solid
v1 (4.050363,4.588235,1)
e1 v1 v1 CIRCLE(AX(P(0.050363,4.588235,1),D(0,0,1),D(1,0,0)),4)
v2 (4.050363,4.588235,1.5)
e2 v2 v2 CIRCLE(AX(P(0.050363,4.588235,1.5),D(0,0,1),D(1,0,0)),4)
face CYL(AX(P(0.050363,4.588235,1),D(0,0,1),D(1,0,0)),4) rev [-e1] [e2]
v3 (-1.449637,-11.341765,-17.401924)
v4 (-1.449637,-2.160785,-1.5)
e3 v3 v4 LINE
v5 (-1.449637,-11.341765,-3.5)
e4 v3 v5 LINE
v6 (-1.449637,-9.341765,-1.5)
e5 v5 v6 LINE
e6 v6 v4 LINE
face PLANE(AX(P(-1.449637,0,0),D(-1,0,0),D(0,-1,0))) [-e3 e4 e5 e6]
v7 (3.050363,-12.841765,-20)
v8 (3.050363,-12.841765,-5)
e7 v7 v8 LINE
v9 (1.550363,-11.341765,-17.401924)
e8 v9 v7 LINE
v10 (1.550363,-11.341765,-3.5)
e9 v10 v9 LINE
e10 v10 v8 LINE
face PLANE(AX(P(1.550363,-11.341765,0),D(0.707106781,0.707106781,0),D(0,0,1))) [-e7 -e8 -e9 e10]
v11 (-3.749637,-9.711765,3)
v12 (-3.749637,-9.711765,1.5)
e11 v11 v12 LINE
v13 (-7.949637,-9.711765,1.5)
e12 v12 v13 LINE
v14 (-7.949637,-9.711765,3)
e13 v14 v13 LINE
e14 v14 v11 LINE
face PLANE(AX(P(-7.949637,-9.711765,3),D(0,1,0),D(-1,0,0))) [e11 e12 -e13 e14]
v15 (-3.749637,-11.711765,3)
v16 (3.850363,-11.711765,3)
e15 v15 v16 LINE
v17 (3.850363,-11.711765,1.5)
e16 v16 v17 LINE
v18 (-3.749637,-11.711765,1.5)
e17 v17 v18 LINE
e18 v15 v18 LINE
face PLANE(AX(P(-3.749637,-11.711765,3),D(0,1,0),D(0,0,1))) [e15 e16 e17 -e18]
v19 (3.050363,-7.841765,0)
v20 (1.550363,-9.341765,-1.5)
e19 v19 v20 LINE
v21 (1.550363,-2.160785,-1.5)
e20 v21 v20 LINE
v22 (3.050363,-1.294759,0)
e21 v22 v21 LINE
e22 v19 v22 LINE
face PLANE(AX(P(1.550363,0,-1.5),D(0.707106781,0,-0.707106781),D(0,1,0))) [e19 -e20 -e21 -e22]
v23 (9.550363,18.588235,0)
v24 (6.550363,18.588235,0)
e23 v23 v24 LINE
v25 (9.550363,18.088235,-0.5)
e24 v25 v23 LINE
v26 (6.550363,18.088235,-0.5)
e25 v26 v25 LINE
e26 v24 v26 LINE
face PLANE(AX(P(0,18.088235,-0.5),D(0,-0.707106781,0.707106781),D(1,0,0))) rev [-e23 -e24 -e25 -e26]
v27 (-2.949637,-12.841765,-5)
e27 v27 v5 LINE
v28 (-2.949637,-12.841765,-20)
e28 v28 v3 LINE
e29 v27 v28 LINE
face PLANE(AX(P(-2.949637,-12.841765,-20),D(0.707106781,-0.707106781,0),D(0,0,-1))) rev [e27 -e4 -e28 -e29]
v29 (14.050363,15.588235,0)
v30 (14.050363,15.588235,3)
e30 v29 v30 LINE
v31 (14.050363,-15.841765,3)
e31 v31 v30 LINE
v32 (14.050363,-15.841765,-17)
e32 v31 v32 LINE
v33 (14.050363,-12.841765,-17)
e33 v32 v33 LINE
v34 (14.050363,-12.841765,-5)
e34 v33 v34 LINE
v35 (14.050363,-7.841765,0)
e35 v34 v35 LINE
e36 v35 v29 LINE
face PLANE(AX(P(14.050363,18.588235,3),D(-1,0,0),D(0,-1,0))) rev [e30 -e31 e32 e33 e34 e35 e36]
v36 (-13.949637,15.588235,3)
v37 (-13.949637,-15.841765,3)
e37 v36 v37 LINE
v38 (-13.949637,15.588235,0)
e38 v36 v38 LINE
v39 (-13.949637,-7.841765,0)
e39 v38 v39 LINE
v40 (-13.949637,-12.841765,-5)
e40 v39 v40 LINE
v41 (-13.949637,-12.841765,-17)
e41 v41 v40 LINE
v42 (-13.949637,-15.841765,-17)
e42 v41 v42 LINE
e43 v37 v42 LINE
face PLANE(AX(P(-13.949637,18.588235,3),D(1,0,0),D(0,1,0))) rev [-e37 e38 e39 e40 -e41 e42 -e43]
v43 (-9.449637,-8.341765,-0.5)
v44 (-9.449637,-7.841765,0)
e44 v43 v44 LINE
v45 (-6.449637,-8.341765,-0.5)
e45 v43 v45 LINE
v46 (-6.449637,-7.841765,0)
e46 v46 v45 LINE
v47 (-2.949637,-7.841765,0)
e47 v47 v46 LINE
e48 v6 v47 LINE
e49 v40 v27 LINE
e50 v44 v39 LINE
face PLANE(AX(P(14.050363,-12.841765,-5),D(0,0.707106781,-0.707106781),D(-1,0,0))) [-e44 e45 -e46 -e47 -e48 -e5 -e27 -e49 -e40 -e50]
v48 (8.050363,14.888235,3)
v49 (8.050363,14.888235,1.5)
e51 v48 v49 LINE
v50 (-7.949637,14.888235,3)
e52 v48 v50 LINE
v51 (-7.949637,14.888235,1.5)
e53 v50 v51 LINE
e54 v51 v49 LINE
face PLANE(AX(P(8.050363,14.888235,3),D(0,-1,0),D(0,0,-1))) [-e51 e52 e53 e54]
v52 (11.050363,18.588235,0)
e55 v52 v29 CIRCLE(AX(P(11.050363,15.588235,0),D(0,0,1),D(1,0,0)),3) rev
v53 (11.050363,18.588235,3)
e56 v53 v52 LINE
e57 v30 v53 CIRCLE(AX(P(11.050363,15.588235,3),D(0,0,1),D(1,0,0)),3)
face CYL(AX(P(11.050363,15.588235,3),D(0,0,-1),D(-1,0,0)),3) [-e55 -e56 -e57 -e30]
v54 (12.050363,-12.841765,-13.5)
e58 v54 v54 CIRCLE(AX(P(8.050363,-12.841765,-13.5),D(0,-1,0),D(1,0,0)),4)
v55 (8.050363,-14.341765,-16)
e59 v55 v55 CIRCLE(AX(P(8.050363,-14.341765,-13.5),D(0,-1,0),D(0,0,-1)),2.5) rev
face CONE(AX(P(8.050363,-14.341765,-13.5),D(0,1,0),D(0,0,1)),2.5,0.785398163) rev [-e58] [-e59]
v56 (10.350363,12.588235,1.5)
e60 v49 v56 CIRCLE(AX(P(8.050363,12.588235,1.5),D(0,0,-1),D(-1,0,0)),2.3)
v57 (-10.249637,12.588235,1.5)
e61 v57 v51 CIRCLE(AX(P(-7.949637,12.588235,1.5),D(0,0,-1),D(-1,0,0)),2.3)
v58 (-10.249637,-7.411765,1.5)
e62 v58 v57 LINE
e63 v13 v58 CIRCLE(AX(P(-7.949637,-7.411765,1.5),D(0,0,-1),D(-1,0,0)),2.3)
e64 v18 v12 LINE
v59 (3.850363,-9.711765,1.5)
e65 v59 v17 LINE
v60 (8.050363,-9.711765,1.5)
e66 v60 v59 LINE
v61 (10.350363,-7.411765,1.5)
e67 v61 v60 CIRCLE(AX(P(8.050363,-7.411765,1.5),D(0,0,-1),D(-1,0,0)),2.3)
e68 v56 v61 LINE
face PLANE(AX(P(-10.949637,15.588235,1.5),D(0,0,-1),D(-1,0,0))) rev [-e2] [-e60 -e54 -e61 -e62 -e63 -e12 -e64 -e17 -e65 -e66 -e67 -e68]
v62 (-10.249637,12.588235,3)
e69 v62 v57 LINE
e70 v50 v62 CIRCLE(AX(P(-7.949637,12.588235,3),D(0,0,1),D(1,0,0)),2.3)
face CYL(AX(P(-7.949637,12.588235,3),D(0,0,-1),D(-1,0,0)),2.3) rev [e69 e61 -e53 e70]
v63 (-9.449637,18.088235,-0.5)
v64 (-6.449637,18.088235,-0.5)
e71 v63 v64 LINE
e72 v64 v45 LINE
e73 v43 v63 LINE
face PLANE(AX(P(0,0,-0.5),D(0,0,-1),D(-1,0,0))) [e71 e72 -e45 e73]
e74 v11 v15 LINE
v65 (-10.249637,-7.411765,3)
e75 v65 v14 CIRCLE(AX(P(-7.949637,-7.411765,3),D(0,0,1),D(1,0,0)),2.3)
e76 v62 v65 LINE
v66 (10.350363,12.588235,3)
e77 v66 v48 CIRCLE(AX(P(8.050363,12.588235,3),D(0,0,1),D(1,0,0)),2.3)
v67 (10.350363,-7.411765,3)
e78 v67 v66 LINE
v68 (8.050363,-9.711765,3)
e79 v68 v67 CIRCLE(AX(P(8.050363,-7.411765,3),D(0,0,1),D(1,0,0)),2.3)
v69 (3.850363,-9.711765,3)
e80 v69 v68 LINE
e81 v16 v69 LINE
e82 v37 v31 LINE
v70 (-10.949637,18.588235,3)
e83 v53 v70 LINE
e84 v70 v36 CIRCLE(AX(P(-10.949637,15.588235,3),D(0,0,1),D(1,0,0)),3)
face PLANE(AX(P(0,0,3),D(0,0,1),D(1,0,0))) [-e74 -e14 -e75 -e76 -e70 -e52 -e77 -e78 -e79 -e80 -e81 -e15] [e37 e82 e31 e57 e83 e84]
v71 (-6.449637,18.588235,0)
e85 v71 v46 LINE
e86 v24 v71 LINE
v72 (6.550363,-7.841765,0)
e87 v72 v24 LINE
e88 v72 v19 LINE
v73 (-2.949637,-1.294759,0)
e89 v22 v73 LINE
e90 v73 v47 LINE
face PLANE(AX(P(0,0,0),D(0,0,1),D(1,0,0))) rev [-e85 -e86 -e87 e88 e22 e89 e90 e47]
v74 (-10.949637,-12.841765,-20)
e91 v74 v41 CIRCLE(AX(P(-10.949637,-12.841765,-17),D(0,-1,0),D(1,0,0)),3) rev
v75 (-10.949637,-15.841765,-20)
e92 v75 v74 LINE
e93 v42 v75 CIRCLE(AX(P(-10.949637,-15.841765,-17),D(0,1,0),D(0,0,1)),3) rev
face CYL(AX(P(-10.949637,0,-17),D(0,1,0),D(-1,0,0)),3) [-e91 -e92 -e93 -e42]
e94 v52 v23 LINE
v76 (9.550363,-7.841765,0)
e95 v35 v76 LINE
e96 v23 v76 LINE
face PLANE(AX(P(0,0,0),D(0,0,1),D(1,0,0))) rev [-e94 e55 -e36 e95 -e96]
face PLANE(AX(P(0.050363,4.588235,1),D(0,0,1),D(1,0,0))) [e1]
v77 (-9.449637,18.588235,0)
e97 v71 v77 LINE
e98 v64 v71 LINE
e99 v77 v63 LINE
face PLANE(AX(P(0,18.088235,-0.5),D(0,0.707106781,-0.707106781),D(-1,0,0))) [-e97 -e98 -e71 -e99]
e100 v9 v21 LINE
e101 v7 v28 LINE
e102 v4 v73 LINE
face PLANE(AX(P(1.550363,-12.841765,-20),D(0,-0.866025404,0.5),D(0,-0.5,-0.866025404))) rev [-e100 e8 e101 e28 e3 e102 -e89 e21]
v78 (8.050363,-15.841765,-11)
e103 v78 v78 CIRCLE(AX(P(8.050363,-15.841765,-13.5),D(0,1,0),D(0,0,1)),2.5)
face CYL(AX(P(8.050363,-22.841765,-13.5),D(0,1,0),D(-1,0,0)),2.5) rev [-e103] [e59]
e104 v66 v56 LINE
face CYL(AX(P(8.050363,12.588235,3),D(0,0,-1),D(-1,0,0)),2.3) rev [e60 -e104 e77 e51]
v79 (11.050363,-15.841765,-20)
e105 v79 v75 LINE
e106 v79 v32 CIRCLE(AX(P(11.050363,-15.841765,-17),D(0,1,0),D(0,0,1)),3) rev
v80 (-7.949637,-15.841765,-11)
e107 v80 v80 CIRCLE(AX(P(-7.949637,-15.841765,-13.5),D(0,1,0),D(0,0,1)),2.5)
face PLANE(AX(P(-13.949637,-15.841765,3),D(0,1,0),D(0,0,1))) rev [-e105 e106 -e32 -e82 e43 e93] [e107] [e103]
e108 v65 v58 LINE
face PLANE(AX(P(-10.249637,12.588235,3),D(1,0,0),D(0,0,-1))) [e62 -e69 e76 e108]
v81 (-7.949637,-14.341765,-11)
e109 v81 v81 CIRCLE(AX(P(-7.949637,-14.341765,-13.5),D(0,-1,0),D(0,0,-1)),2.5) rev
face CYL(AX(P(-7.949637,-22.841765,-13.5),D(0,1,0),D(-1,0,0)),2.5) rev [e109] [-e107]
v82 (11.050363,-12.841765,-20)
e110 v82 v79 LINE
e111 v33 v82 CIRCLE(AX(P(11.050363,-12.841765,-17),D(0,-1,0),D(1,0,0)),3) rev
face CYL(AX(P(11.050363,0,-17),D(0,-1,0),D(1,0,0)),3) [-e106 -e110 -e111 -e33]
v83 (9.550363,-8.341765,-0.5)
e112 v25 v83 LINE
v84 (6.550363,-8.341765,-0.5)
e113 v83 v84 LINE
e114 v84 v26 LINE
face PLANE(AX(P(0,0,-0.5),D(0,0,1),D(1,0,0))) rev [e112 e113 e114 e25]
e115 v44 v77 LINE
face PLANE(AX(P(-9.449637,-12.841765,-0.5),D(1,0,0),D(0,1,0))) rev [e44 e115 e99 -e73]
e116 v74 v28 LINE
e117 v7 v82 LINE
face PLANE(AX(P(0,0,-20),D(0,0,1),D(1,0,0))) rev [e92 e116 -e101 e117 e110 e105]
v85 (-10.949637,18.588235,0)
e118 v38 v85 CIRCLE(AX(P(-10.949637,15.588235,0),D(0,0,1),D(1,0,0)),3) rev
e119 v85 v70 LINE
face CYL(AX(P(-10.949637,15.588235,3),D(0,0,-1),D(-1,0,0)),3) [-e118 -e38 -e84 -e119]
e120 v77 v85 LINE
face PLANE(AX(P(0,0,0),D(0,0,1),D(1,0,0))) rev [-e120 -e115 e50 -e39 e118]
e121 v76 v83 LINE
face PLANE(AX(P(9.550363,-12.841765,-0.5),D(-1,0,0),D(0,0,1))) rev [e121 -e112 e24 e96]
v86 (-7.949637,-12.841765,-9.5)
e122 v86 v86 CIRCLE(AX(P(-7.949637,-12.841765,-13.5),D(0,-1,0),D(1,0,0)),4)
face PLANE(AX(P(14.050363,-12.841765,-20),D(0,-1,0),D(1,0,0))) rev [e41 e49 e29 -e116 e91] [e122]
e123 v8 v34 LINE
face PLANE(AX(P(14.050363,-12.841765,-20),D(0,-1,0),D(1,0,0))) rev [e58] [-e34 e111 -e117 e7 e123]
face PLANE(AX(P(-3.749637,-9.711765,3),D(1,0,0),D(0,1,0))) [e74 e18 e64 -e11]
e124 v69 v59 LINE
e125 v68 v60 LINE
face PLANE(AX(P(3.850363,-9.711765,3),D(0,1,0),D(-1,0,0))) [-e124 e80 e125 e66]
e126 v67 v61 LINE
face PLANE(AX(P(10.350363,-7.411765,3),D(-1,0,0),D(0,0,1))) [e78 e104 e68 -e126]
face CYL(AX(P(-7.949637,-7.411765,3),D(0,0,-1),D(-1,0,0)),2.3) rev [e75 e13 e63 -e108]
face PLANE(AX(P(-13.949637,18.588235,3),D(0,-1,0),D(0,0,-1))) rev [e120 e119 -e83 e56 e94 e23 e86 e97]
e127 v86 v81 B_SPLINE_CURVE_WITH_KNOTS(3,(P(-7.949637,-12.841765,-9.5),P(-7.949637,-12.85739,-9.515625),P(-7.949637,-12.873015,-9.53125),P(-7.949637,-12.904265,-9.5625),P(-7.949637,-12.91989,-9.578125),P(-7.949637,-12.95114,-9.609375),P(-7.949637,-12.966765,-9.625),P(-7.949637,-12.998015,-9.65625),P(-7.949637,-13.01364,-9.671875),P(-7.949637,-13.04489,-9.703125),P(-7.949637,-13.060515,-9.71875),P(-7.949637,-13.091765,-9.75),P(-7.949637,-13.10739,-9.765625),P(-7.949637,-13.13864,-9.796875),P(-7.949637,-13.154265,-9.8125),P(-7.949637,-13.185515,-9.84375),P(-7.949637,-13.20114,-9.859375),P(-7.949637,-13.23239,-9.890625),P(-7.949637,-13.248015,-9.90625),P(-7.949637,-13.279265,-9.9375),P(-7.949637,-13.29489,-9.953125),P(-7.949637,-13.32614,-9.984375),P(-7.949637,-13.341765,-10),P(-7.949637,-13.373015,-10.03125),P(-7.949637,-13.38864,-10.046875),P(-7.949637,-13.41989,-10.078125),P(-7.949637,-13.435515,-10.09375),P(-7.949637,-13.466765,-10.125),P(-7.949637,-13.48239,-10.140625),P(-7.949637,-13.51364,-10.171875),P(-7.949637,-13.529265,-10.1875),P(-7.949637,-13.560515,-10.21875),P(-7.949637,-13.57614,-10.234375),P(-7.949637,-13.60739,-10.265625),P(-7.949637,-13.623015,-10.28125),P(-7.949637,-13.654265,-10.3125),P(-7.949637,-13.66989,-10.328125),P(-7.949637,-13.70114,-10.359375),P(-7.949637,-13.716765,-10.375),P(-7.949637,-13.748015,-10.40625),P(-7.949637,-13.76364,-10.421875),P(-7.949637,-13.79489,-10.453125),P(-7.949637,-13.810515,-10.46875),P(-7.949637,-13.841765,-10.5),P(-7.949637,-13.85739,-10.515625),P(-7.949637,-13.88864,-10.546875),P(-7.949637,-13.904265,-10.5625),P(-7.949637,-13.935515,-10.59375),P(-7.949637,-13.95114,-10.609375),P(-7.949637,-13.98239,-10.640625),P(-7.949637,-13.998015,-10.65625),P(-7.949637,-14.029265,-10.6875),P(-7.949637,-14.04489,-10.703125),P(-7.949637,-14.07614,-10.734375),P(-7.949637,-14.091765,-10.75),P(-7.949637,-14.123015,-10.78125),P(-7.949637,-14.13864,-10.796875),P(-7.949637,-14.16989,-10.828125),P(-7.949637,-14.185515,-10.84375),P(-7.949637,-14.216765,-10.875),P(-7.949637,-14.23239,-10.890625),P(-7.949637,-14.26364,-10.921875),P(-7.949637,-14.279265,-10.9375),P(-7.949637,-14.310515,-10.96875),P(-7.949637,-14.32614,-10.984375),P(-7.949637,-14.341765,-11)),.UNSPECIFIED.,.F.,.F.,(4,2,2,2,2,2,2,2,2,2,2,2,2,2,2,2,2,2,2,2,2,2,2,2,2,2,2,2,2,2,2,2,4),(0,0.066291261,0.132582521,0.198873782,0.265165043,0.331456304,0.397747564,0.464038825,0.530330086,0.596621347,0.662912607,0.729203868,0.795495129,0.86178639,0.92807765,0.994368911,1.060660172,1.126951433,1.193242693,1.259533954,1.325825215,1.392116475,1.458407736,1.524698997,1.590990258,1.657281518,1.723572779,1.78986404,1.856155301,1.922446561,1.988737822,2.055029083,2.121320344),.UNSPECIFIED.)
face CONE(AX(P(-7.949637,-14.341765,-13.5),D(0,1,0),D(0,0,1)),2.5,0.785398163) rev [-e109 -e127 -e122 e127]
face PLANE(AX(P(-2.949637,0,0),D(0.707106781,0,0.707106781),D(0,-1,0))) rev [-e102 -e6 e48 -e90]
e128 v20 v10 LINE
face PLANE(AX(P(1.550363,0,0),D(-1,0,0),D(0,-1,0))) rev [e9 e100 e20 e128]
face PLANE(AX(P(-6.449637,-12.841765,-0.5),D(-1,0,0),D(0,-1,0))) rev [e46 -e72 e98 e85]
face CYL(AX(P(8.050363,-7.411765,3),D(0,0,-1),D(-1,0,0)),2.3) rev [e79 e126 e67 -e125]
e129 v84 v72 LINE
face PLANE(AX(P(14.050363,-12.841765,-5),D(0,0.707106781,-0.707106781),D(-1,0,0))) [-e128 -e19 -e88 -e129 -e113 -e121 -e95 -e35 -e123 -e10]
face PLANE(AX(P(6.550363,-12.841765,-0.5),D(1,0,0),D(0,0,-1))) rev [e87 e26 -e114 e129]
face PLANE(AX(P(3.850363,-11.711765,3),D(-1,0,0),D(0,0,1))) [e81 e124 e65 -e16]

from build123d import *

# Parameters (mm, degrees)
ESBO_O2_W                = 28
ESBO_O2_H                = 34.43
RESSALTO_EXTRUS_O1_DEPTH = 3
FILETE1_R                = 3
RESSALTO_EXTRUS_O2_START = -1.5
RESSALTO_EXTRUS_O2_DEPTH = 1.5
ESBO_O5_W                = 28
ESBO_O5_H                = 3
RESSALTO_EXTRUS_O3_DEPTH = 20
ESBO_O6_R                = 2.5
CORTE_EXTRUS_O1_DEPTH    = 10
FILETE2_R                = 3
RESSALTO_EXTRUS_O4_DEPTH = 1.5
CHANFRO1_SIZE            = 1.5
CHANFRO2_SIZE            = 1.5
ESBO_O8_R                = 4
CORTE_EXTRUS_O2_DEPTH    = 0.5
CHANFRO3_SIZE            = 5
ESBO_O9_W                = 3
ESBO_O9_H                = 31.43
RESSALTO_EXTRUS_O5_DEPTH = 0.5
CHANFRO4_SIZE            = 0.5


with BuildPart() as part:
    # Esboço2 → Ressalto-extrusão1 (new body)
    with BuildSketch(Plane.XY):
        with Locations((0.050363351, 1.373235294)):
            Rectangle(ESBO_O2_W, ESBO_O2_H)
        with BuildLine():
            Line((8.050363351, 14.888235294), (-7.949636649, 14.888235294))
            ThreePointArc((-7.949636649, 14.888235294), (-9.575982246, 14.214580891), (-10.249636649, 12.588235294))
            Line((-10.249636649, 12.588235294), (-10.249636649, -7.411764706))
            ThreePointArc((-10.249636649, -7.411764706), (-9.575982246, -9.038110303), (-7.949636649, -9.711764706))
            Line((-7.949636649, -9.711764706), (-3.749636649, -9.711764706))
            Line((-3.749636649, -9.711764706), (-3.749636649, -11.711764706))
            Line((-3.749636649, -11.711764706), (3.850363351, -11.711764706))
            Line((3.850363351, -11.711764706), (3.850363351, -9.711764706))
            Line((3.850363351, -9.711764706), (8.050363351, -9.711764706))
            ThreePointArc((8.050363351, -9.711764706), (9.676708947, -9.038110303), (10.350363351, -7.411764706))
            Line((10.350363351, -7.411764706), (10.350363351, 12.588235294))
            ThreePointArc((10.350363351, 12.588235294), (9.676708947, 14.214580891), (8.050363351, 14.888235294))
        make_face(mode=Mode.SUBTRACT)
    extrude(amount=RESSALTO_EXTRUS_O1_DEPTH)

    # Filete1
    filete1_edges = [part.edges().sort_by_distance(p)[0] for p in [
        (-13.949636649, 18.588235294, 1.5),
        (14.050363351, 18.588235294, 1.5),
    ]]
    fillet(filete1_edges, radius=FILETE1_R)

    # Esboço3 → Ressalto-extrusão2 (add)
    with BuildSketch(Plane(origin=(0, 0, 0), x_dir=(-1, 0, 0), z_dir=(0, 0, -1)).offset(RESSALTO_EXTRUS_O2_START)):
        with BuildLine():
            Line((13.949636649, 15.588235294), (13.949636649, -15.841764706))
            Line((13.949636649, -15.841764706), (-14.050363351, -15.841764706))
            Line((-14.050363351, -15.841764706), (-14.050363351, 15.588235294))
            ThreePointArc((-14.050363351, 15.588235294), (-13.171683694, 17.709555638), (-11.050363351, 18.588235294))
            Line((-11.050363351, 18.588235294), (10.949636649, 18.588235294))
            ThreePointArc((10.949636649, 18.588235294), (13.070956993, 17.709555638), (13.949636649, 15.588235294))
        make_face()
    extrude(amount=RESSALTO_EXTRUS_O2_DEPTH)

    # Esboço5 → Ressalto-extrusão3 (add)
    with BuildSketch(Plane(origin=(0, 0, 0), x_dir=(-1, 0, 0), z_dir=(0, 0, -1))):
        with Locations((-0.050363351, -14.341764706)):
            Rectangle(ESBO_O5_W, ESBO_O5_H)
    extrude(amount=RESSALTO_EXTRUS_O3_DEPTH)

    # Esboço6 → Corte-extrusão1 (cut)
    with BuildSketch(Plane(origin=(0, -12.841764706, 0), x_dir=(1, 0, 0), z_dir=(0, 1, 0))):
        with Locations(Location((-7.949636649, 13.5, 0), (0, 0, 180))):
            Circle(ESBO_O6_R)
        with Locations(Location((8.050363351, 13.5, 0), (0, 0, 180))):
            Circle(ESBO_O6_R)
    extrude(amount=-CORTE_EXTRUS_O1_DEPTH, mode=Mode.SUBTRACT)

    # Filete2
    filete2_edges = [part.edges().sort_by_distance(p)[0] for p in [
        (14.050363351, -14.341764706, -20),
        (-13.949636649, -14.341764706, -20),
    ]]
    fillet(filete2_edges, radius=FILETE2_R)

    # Esboço7 → Ressalto-extrusão4 (add, symmetric)
    with BuildSketch(Plane(origin=(0.050363351, 0, 0), x_dir=(0, 0, -1), z_dir=(1, 0, 0))):
        Polygon((0, -1.294759322), (0, -12.841764706), (20, -12.841764706), align=None)
    extrude(amount=RESSALTO_EXTRUS_O4_DEPTH, both=True)

    # Chanfro1
    # the kernel refuses this chamfer: 1.5 mm, written as the material it adds along each edge
    with BuildSketch(Plane(origin=(-1.449636649, -12.841764706, 3.857524482), x_dir=(-0.9996219169112968, -0.027495876610586813, 0), z_dir=(0, 0, -1))) as chanfro1_piece_1_section:
        Polygon((CHANFRO1_SIZE * 0.999621916911, CHANFRO1_SIZE * 0.0274958766106), (-CHANFRO1_SIZE * 0.0274958766106, CHANFRO1_SIZE * 0.999621916911), (0, 0), align=None)
    chanfro1_piece_1 = extrude(amount=27.715048964, mode=Mode.PRIVATE)
    chanfro1_piece_1 = split(chanfro1_piece_1, bisect_by=Plane(origin=(-1.978250847, -8.234905434, -12.020685678), z_dir=(0, -0.8660254037844417, 0.4999999999999947)), keep=Keep.TOP, mode=Mode.PRIVATE)
    chanfro1_piece_1 = split(chanfro1_piece_1, bisect_by=Plane(origin=(-1.978250847, -12.398993102, 1.5), z_dir=(0, 0, -1)), keep=Keep.TOP, mode=Mode.PRIVATE)
    add(chanfro1_piece_1)
    with BuildSketch(Plane(origin=(-1.449636649, 2.56276516, 0), x_dir=(-0.9996219169112969, 0, 0.027495876610586372), z_dir=(0, -1, 0))) as chanfro1_piece_2_section:
        Polygon((CHANFRO1_SIZE * 0.999621916911, CHANFRO1_SIZE * 0.0274958766106), (-CHANFRO1_SIZE * 0.0274958766106, CHANFRO1_SIZE * 0.999621916911), (0, 0), align=None)
    chanfro1_piece_2 = extrude(amount=19.262054348, mode=Mode.PRIVATE)
    chanfro1_piece_2 = split(chanfro1_piece_2, bisect_by=Plane(origin=(-1.952841778, -15.841764706, -0.493589744), z_dir=(0, 1, 0)), keep=Keep.TOP, mode=Mode.PRIVATE)
    chanfro1_piece_2 = split(chanfro1_piece_2, bisect_by=Plane(origin=(-1.952841778, -2.987487395, -2.931891026), z_dir=(0, -0.8660254037844417, 0.4999999999999947)), keep=Keep.TOP, mode=Mode.PRIVATE)
    add(chanfro1_piece_2)
    with BuildSketch(Plane(origin=(1.550363351, -12.841764706, 3.857524482), x_dir=(-0.02749587661058648, 0.9996219169112968, 0), z_dir=(0, 0, -1))) as chanfro1_piece_3_section:
        Polygon((CHANFRO1_SIZE * 0.999621916911, CHANFRO1_SIZE * 0.0274958766106), (-CHANFRO1_SIZE * 0.0274958766106, CHANFRO1_SIZE * 0.999621916911), (0, 0), align=None)
    chanfro1_piece_3 = extrude(amount=27.715048964, mode=Mode.PRIVATE)
    chanfro1_piece_3 = split(chanfro1_piece_3, bisect_by=Plane(origin=(1.674066113, -7.728766139, -11.144026704), z_dir=(0, -0.8660254037844417, 0.4999999999999947)), keep=Keep.TOP, mode=Mode.PRIVATE)
    chanfro1_piece_3 = split(chanfro1_piece_3, bisect_by=Plane(origin=(1.674066113, -11.58917023, 1.5), z_dir=(0, 0, -1)), keep=Keep.TOP, mode=Mode.PRIVATE)
    add(chanfro1_piece_3)
    with BuildSketch(Plane(origin=(1.550363351, 2.56276516, 0), x_dir=(0.9996219169112969, 0, 0.027495876610586372), z_dir=(0, -1, 0))) as chanfro1_piece_4_section:
        Polygon((CHANFRO1_SIZE * 0.999621916911, -CHANFRO1_SIZE * 0.0274958766106), (-CHANFRO1_SIZE * 0.0274958766106, -CHANFRO1_SIZE * 0.999621916911), (0, 0), align=None)
    chanfro1_piece_4 = extrude(amount=15.404529866, mode=Mode.PRIVATE)
    chanfro1_piece_4 = split(chanfro1_piece_4, bisect_by=Plane(origin=(2.053568479, -2.987487395, -2.931891026), z_dir=(0, -0.8660254037844417, 0.4999999999999947)), keep=Keep.TOP, mode=Mode.PRIVATE)
    add(chanfro1_piece_4)

    # Chanfro2
    chanfro2_edges = [part.edges().sort_by_distance(p)[0] for p in [
        (-5.449636649, -12.841764706, -13.5),
        (10.550363351, -12.841764706, -13.5),
    ]]
    chamfer(chanfro2_edges, length=CHANFRO2_SIZE)

    # Esboço8 → Corte-extrusão2 (cut)
    with BuildSketch(Plane.XY.offset(1.5)):
        with Locations((0.050363351, 4.588235294)):
            Circle(ESBO_O8_R)
    extrude(amount=-CORTE_EXTRUS_O2_DEPTH, mode=Mode.SUBTRACT)

    # Chanfro3
    # the kernel refuses this chamfer: 5 mm, written as the material it adds along each edge
    with BuildSketch(Plane(origin=(-13.949636649, -12.841764706, 0), x_dir=(0, -0.027495876610586317, -0.9996219169112968), z_dir=(1, 0, 0))) as chanfro3_piece_1:
        Polygon((CHANFRO3_SIZE * 0.999621916911, CHANFRO3_SIZE * 0.0274958766106), (-CHANFRO3_SIZE * 0.0274958766106, CHANFRO3_SIZE * 0.999621916911), (0, 0), align=None)
    extrude(amount=23.85841494)
    with BuildSketch(Plane(origin=(-9.808051589, -12.841764706, 0), x_dir=(0, 0.9996219169112968, 0.027495876610586372), z_dir=(1, 0, 0))) as chanfro3_piece_2:
        Polygon((CHANFRO3_SIZE * 0.999621916911, -CHANFRO3_SIZE * 0.0274958766106), (-CHANFRO3_SIZE * 0.0274958766106, -CHANFRO3_SIZE * 0.999621916911), (0, 0), align=None)
    extrude(amount=23.85841494)

    # Esboço9 → Ressalto-extrusão5 (add)
    with BuildSketch(Plane(origin=(0, 0, 0), x_dir=(-1, 0, 0), z_dir=(0, 0, -1))):
        with Locations((-8.050363351, 2.873235294)):
            Rectangle(ESBO_O9_W, ESBO_O9_H)
        with Locations((7.949636649, 2.873235294)):
            Rectangle(ESBO_O9_W, ESBO_O9_H)
    extrude(amount=RESSALTO_EXTRUS_O5_DEPTH)

    # Chanfro4
    chanfro4_edges = [part.edges().sort_by_distance(p)[0] for p in [
        (-7.949636649, 18.588235294, -0.5),
        (8.050363351, 18.588235294, -0.5),
    ]]
    chamfer(chanfro4_edges, length=CHANFRO4_SIZE)


solid = part.part
